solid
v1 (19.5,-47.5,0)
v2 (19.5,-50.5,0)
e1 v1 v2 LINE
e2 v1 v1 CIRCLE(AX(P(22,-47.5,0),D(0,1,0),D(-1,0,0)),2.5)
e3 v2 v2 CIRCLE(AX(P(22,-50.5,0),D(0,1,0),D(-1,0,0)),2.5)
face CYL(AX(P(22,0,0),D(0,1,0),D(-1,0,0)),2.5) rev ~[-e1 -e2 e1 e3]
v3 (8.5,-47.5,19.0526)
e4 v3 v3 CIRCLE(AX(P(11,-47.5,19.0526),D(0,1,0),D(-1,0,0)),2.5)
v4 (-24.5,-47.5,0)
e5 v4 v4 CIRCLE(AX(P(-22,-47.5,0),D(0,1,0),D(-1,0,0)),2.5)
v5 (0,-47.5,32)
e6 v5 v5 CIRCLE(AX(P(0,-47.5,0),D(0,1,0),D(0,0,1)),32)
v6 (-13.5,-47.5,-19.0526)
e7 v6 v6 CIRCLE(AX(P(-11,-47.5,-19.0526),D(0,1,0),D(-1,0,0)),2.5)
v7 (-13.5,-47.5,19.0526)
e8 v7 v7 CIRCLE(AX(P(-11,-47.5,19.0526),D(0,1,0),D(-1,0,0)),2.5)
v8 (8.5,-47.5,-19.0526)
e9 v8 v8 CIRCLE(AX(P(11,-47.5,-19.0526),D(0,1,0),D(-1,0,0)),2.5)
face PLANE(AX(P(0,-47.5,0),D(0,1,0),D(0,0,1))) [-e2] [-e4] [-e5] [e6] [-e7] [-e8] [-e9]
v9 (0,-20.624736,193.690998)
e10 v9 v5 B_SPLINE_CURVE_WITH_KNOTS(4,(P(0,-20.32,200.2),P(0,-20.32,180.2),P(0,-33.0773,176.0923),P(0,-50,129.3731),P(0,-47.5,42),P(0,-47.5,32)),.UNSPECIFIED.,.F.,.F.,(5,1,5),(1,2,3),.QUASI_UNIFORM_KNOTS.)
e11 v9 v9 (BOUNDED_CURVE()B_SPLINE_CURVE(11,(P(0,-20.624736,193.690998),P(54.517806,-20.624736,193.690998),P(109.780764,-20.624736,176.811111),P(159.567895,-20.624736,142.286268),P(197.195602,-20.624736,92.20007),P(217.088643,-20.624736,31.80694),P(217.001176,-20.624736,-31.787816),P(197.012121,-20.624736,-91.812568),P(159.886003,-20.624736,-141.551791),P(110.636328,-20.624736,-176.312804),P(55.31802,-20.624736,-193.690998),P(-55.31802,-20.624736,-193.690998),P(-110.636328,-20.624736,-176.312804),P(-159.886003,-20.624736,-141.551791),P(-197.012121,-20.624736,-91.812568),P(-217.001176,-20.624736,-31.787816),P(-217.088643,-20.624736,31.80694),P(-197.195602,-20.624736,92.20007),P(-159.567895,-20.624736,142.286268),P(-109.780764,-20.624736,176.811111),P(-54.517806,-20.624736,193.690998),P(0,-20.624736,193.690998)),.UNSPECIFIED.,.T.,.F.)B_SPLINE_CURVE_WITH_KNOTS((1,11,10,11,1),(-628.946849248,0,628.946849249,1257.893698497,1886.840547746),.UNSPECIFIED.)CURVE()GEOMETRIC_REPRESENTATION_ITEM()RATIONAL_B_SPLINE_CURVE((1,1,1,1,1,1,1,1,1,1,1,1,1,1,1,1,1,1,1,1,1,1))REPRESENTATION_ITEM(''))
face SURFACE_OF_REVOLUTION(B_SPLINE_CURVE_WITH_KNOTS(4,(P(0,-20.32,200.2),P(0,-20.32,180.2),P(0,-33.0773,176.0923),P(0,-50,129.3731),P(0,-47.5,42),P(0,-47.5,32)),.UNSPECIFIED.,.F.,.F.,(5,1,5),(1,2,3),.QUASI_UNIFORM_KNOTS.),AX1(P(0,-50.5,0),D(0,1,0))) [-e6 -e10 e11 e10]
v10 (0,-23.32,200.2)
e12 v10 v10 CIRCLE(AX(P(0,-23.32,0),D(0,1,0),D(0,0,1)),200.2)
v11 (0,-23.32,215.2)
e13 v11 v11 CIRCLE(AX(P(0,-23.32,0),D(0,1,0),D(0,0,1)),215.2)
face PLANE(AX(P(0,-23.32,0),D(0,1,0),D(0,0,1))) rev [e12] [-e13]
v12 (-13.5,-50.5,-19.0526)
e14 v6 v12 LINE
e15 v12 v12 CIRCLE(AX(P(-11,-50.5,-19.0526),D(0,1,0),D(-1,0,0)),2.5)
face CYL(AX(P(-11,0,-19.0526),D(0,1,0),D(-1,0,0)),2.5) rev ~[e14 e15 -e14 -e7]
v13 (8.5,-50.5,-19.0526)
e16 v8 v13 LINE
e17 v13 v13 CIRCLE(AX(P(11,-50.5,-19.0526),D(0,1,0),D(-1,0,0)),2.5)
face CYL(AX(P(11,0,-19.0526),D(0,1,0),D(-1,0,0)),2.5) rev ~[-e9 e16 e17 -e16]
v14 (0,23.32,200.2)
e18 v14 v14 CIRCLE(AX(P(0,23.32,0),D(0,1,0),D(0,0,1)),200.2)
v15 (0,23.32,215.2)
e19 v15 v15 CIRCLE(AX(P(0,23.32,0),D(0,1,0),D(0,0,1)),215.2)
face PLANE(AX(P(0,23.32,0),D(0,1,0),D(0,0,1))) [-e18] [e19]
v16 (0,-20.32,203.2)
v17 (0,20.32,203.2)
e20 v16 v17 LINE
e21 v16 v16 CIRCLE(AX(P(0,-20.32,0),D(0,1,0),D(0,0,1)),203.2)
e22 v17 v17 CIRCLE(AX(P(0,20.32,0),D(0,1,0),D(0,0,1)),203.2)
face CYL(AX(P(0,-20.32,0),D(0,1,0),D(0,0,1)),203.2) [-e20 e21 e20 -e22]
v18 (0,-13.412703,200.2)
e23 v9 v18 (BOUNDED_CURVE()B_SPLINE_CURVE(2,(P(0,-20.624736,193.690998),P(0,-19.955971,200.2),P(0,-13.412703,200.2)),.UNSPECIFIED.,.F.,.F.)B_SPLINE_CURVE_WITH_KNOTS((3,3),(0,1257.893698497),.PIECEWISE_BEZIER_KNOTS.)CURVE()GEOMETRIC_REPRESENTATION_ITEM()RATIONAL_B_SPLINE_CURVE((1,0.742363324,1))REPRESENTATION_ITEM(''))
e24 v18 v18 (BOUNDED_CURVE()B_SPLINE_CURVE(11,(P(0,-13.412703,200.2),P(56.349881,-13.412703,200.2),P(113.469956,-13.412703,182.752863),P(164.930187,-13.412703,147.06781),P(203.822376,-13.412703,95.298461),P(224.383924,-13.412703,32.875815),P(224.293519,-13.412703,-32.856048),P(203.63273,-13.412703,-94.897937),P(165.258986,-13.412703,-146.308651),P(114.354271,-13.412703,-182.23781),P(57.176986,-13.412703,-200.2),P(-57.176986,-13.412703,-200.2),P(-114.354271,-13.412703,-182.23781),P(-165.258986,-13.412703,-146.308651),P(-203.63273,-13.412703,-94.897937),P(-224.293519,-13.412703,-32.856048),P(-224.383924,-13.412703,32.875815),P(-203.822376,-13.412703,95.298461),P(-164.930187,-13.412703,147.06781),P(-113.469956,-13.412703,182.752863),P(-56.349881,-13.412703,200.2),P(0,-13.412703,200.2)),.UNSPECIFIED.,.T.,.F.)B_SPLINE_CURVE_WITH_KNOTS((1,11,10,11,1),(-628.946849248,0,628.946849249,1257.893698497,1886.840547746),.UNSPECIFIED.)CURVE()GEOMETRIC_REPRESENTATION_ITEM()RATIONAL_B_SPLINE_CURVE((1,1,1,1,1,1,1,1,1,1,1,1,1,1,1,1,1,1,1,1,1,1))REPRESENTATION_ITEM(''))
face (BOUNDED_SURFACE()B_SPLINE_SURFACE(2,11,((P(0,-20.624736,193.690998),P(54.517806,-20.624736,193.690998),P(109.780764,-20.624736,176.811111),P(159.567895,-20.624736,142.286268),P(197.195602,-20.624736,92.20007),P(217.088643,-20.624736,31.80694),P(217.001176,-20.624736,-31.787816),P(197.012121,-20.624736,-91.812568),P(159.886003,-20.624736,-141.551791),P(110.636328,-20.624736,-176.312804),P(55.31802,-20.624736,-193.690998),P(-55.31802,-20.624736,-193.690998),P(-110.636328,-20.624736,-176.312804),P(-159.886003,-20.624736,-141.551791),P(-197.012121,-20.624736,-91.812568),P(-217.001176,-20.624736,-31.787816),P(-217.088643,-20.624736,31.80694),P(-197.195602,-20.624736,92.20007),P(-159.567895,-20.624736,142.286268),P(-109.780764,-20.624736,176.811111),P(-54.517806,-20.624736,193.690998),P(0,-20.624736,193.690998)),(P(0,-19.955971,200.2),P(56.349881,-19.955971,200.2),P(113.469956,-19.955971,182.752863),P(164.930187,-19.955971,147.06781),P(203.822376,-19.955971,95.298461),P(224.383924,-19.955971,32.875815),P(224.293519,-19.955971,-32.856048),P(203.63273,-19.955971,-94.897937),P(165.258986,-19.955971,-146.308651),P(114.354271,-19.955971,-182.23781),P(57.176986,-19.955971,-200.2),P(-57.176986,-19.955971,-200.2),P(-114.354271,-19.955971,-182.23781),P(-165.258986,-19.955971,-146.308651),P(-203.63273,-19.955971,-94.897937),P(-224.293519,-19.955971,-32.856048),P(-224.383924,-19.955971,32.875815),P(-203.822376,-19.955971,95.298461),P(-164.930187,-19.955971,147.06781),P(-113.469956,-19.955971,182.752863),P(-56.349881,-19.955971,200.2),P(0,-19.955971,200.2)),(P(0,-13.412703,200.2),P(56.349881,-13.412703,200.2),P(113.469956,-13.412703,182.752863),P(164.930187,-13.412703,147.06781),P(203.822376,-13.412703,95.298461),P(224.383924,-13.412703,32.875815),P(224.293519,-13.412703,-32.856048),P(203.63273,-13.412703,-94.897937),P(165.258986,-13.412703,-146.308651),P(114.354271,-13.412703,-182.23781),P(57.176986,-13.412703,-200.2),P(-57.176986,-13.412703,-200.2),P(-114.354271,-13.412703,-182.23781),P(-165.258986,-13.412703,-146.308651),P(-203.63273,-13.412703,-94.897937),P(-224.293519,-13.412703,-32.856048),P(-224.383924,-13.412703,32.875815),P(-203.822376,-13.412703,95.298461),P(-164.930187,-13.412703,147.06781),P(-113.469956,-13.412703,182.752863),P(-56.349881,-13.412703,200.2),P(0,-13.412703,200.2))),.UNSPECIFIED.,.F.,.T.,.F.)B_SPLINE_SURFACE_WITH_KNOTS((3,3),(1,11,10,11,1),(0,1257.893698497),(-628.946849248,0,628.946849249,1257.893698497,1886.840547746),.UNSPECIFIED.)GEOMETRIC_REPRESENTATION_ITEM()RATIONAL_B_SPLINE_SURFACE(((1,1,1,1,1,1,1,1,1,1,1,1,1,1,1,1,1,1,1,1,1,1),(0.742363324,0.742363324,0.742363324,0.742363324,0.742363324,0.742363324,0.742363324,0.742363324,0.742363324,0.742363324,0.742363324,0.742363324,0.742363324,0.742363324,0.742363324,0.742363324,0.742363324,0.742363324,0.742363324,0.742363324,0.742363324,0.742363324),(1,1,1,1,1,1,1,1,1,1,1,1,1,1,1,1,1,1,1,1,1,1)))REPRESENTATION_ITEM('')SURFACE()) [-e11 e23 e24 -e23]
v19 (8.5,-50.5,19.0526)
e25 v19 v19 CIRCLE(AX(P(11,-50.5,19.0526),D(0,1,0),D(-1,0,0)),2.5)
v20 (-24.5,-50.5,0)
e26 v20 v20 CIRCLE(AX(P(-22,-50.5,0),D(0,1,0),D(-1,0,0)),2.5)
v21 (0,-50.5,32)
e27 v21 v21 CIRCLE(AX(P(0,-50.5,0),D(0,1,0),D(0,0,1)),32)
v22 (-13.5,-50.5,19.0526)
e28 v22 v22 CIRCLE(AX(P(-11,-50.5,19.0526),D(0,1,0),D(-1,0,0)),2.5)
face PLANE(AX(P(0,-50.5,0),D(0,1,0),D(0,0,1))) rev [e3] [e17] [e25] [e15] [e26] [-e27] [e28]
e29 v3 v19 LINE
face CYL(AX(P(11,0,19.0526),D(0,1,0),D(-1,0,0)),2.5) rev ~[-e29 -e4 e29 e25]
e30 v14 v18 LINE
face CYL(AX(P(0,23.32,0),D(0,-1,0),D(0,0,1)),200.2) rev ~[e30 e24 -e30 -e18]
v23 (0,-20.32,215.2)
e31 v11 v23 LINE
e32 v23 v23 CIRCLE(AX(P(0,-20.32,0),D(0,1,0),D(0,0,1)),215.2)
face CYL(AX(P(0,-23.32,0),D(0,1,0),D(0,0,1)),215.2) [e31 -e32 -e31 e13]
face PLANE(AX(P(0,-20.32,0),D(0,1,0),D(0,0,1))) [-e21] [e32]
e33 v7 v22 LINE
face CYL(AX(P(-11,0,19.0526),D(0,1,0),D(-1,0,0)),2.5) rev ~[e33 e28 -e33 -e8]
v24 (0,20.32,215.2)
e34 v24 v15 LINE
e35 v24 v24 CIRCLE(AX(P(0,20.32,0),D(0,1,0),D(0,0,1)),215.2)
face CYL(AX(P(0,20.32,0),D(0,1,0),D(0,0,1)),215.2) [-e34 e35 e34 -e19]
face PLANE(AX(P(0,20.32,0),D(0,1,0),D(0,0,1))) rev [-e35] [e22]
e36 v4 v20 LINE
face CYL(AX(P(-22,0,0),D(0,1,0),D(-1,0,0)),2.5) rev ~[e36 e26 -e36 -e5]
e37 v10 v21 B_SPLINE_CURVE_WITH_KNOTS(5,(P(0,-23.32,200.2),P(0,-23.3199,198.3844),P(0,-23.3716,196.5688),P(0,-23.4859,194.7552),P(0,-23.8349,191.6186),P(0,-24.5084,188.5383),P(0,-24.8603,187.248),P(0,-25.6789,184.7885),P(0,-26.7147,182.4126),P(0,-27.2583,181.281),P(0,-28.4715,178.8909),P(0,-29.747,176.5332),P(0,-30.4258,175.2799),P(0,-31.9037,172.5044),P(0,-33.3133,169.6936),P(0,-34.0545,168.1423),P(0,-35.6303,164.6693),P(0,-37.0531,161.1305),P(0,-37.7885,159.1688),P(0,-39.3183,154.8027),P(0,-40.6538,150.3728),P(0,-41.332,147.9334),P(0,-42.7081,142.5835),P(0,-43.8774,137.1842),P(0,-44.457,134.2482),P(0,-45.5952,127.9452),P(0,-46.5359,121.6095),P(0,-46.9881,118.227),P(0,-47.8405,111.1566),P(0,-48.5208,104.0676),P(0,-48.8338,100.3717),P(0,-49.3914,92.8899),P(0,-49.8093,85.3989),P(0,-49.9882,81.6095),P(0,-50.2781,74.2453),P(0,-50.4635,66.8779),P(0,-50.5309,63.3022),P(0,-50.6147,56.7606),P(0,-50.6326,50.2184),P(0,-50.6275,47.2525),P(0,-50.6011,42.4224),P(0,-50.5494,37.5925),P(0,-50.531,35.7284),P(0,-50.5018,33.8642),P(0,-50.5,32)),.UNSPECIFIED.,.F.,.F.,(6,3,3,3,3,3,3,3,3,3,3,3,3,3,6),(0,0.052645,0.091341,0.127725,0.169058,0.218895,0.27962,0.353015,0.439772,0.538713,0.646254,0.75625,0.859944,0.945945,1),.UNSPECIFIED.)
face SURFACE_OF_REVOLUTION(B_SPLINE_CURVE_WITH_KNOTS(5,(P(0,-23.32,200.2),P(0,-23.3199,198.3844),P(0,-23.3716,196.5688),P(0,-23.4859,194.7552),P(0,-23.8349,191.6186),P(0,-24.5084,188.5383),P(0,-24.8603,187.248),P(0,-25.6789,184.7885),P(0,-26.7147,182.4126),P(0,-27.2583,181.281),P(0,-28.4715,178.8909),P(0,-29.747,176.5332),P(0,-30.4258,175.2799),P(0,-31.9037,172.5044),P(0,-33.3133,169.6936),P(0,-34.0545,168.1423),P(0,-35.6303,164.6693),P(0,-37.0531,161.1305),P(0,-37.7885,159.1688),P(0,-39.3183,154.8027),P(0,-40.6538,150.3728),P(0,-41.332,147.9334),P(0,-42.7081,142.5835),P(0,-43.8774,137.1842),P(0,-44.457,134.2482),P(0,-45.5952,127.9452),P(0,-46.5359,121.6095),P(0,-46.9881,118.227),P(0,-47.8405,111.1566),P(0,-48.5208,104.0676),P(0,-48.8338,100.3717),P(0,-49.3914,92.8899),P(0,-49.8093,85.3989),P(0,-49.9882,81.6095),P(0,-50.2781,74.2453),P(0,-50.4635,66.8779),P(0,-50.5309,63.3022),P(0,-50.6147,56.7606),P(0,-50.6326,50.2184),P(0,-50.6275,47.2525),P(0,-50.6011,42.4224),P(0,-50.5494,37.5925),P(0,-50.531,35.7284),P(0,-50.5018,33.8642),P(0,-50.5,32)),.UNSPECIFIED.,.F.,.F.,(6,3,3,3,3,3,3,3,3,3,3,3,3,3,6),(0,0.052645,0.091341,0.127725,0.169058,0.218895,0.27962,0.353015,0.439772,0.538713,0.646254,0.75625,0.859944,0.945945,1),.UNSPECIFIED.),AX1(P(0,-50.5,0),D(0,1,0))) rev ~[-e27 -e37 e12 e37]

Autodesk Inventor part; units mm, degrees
ref_plane "YZ Plane" through (0, 0, 0) normal (1, 0, 0) x (0, 1, 0)
ref_plane "XZ Plane" through (0, 0, 0) normal (0, 1, 0) x (-1, 0, 0)
ref_plane "XY Plane" through (0, 0, 0) normal (0, 0, 1) x (1, 0, 0)
sketch "Esquisse1" plane through (0, 0, 0) normal (1, 0, 0) x (0, 1, 0)
  line L0 (0, -56) -> (0, 56)
  line L1 (-49.4, 0) -> (30.4, 0)
  line L2 (-47.5, 32) -> (-47.5, 0)
  line L3 (23.32, 200.2) -> (-20.32, 200.2)
  line L4 (-50.5, 0) -> (-50.5, 32)
  line L5 (-47.5, 0) -> (-50.5, 0)
  line L6 (-50.5, 0) -> (-47.5, 0)
  line L7 (-47.5, 32) -> (-50.5, 32) construction
  line L8 (-47.5, -30) -> (-47.5, 30) projected
  line L9 (-17.32, -203.2) -> (-17.32, 203.2) construction
  line L10 (-20.32, -203.2) -> (-20.32, 203.2) construction
  line L11 (18.32, 203.2) -> (18.32, -203.2) construction
  line L12 (17.32, -203.2) -> (17.32, 203.2) construction
  line L13 (20.32, -203.2) -> (20.32, 203.2) construction
  line L14 (20.32, 215.2) -> (23.32, 215.2)
  line L15 (23.32, 215.2) -> (23.32, 200.2)
  line L16 (-23.32, 200.2) -> (-23.32, 215.2)
  line L17 (-23.32, 215.2) -> (-20.32, 215.2)
  line L18 (-20.32, 215.2) -> (-20.32, 203.2)
  line L19 (-20.32, 203.2) -> (20.32, 203.2)
  line L20 (20.32, 203.2) -> (20.32, 215.2)
  line L21 (-20.32, 200.2) -> (-23.32, 200.2) construction
  line L22 (20.32, 203.2) -> (20.32, 200.2) construction
  line L23 (-20.32, 200.2) -> (-20.32, 180.2) construction
  line L24 (-20.32, 180.2) -> (-33.0773, 176.0923) construction
  line L25 (-33.0773, 176.0923) -> (-50, 129.3731) construction
  line L26 (-50, 129.3731) -> (-47.5, 42) construction
  line L27 (-47.5, 42) -> (-47.5, 32) construction
  spline S0 degree 4 poles (-20.32, 200.2) (-20.32, 180.2) (-33.0773, 176.0923) (-50, 129.3731) (-47.5, 42) (-47.5, 32) knots 1 1 1 1 1 2 3 3 3 3 3
  spline S1 degree 5 poles (-23.32, 200.2) (-23.3199, 198.3844) (-23.3716, 196.5688) (-23.4859, 194.7552) (-23.8349, 191.6186) (-24.5084, 188.5383) (-24.8603, 187.248) (-25.6789, 184.7885) (-26.7147, 182.4126) (-27.2583, 181.281) (-28.4715, 178.8909) (-29.747, 176.5332) (-30.4258, 175.2799) (-31.9037, 172.5044) (-33.3133, 169.6936) (-34.0545, 168.1423) (-35.6303, 164.6693) (-37.0531, 161.1305) (-37.7885, 159.1688) (-39.3183, 154.8027) (-40.6538, 150.3728) (-41.332, 147.9334) (-42.7081, 142.5835) (-43.8774, 137.1842) (-44.457, 134.2482) (-45.5952, 127.9452) (-46.5359, 121.6095) (-46.9881, 118.227) (-47.8405, 111.1566) (-48.5208, 104.0676) (-48.8338, 100.3717) (-49.3914, 92.8899) (-49.8093, 85.3989) (-49.9882, 81.6095) (-50.2781, 74.2453) (-50.4635, 66.8779) (-50.5309, 63.3022) (-50.6147, 56.7606) (-50.6326, 50.2184) (-50.6275, 47.2525) (-50.6011, 42.4224) (-50.5494, 37.5925) (-50.531, 35.7284) (-50.5018, 33.8642) (-50.5, 32) knots 0 0 0 0 0 0 0.052645 0.052645 0.052645 0.091341 0.091341 0.091341 0.127725 0.127725 0.127725 0.169058 0.169058 0.169058 0.218895 0.218895 0.218895 0.27962 0.27962 0.27962 0.353015 0.353015 0.353015 0.439772 0.439772 0.439772 0.538713 0.538713 0.538713 0.646254 0.646254 0.646254 0.75625 0.75625 0.75625 0.859944 0.859944 0.859944 0.945945 0.945945 0.945945 1 1 1 1 1 1
  point P0 (0, 0)
  point P1 (-20.32, 200.2)
  dimension "d9" = 3
  dimension "d16" = 203.2
  dimension "d17" = 12
  dimension "d19" = 32
  dimension "d21" = 20
  dimension "d22" = 10
revolve "Révolution1" add sketch "Esquisse1" angle 360 about axis through (0, -49.4, 0) along (0, 1, 0)
sketch "Esquisse2" plane through (0, 0, 0) normal (0, 1, 0) x (-1, 0, 0)
  circle A0 centre (11, 19.0526) radius 2.5
  circle A1 centre (-11, 19.0526) radius 2.5
  circle A2 centre (-22, 0) radius 2.5
  circle A3 centre (-11, -19.0526) radius 2.5
  circle A4 centre (11, -19.0526) radius 2.5
  circle A5 centre (22, 0) radius 2.5
  circle A6 centre (-11, -19.0526) radius 2.5
  circle A7 centre (11, -19.0526) radius 2.5
  circle A8 centre (22, 0) radius 2.5
  circle A9 centre (11, 19.0526) radius 2.5
  circle A10 centre (-11, 19.0526) radius 2.5
  circle A11 centre (-22, 0) radius 2.5
  circle A12 centre (0, 0) radius 30
  circle A13 centre (0, 0) radius 13
  point P0 (0, 0)
extrude "Extrusion1" cut sketch "Esquisse2" against normal through all contours A0 | A1 | A2 | A3 | A4 | A5
fillet "Congé1" [suppressed]
fillet "Congé3" radius 7.25 1 edges at (0, -20.32, -200.2)
equation "\"d_profile_section\" = 40"
equation "\"d_prfc_thickness\" = 3"
equation "\"d_arm_in_diameter\" = 27"
equation "\"d_arm_out_diameter\" = 30"
equation "\"d_arm_length\" = 250"
equation "\"d_suspension_height\" = 140"
equation "\"d_aluminum_thickness\" = 3.175"
equation "\"d_suspension_box_width\" = 40"
equation "\"d_wheelbase\" = 1600"
equation "\"a_tilt\" = 10deg"
equation "\"d_rear_profile_height\" = 101.6"
equation "\"d_rear_profile_width\" = 50.8"
equation "\"d_central_profile_width\" = 50.8"
equation "\"d_central_profile_height\" = 101.6"
equation "\"d_handle_bar_tube_diameter\" = 35"
equation "\"a_direction_column\" = 35deg"
equation "\"prfc_tube_id\" = 33"
equation "\"prfc_tube_od\" = 35"
equation "\"front_suspension_height\" = 140.92977"
equation "\"front_suspension_width\" = 150"
equation "\"caster_angle\" = 24deg"
equation "\"a_caster_angle\" = 25deg"
equation "\"d_handlebar_pivot_offset\" = 65"
equation "\"d_handlebar_arm_length\" = 80"
equation "\"a_handlebar_angle\" = 60deg"
equation "\"d_left_to_right_front_pivots\" = 28"
equation "\"d_front_arm_id\" = 29.2608"
equation "\"d_front_arm_od\" = 31.75"
equation "\"d_aluminum_bar_thickness\" = 12.7"
equation "\"d_handle_bar_id\" = 30"
equation "\"d_handle_bar_od\" = 38.1"
equation "\"d_steering_arm_length\" = 70"
equation "\"d_steering_height_from_hub_center\" = 28"
equation "\"d_steering_height_from_hub_carrier_center\" = 18"
equation "\"d_central_beam_inclination\" = 12"
equation "\"a_central_beam_inclination\" = 12deg"
equation "\"d_central_beam_screws_diameter\" = 8"
equation "\"d_rear_profile_wall_thickness\" = 4.7625"
equation "\"d_rear_profile_wall_thickness_1\" = 4.7625"
equation "\"d_central_pivot_screw_diameter\" = 15.875"
properties part number "wheel_rim" material "CFRP"
